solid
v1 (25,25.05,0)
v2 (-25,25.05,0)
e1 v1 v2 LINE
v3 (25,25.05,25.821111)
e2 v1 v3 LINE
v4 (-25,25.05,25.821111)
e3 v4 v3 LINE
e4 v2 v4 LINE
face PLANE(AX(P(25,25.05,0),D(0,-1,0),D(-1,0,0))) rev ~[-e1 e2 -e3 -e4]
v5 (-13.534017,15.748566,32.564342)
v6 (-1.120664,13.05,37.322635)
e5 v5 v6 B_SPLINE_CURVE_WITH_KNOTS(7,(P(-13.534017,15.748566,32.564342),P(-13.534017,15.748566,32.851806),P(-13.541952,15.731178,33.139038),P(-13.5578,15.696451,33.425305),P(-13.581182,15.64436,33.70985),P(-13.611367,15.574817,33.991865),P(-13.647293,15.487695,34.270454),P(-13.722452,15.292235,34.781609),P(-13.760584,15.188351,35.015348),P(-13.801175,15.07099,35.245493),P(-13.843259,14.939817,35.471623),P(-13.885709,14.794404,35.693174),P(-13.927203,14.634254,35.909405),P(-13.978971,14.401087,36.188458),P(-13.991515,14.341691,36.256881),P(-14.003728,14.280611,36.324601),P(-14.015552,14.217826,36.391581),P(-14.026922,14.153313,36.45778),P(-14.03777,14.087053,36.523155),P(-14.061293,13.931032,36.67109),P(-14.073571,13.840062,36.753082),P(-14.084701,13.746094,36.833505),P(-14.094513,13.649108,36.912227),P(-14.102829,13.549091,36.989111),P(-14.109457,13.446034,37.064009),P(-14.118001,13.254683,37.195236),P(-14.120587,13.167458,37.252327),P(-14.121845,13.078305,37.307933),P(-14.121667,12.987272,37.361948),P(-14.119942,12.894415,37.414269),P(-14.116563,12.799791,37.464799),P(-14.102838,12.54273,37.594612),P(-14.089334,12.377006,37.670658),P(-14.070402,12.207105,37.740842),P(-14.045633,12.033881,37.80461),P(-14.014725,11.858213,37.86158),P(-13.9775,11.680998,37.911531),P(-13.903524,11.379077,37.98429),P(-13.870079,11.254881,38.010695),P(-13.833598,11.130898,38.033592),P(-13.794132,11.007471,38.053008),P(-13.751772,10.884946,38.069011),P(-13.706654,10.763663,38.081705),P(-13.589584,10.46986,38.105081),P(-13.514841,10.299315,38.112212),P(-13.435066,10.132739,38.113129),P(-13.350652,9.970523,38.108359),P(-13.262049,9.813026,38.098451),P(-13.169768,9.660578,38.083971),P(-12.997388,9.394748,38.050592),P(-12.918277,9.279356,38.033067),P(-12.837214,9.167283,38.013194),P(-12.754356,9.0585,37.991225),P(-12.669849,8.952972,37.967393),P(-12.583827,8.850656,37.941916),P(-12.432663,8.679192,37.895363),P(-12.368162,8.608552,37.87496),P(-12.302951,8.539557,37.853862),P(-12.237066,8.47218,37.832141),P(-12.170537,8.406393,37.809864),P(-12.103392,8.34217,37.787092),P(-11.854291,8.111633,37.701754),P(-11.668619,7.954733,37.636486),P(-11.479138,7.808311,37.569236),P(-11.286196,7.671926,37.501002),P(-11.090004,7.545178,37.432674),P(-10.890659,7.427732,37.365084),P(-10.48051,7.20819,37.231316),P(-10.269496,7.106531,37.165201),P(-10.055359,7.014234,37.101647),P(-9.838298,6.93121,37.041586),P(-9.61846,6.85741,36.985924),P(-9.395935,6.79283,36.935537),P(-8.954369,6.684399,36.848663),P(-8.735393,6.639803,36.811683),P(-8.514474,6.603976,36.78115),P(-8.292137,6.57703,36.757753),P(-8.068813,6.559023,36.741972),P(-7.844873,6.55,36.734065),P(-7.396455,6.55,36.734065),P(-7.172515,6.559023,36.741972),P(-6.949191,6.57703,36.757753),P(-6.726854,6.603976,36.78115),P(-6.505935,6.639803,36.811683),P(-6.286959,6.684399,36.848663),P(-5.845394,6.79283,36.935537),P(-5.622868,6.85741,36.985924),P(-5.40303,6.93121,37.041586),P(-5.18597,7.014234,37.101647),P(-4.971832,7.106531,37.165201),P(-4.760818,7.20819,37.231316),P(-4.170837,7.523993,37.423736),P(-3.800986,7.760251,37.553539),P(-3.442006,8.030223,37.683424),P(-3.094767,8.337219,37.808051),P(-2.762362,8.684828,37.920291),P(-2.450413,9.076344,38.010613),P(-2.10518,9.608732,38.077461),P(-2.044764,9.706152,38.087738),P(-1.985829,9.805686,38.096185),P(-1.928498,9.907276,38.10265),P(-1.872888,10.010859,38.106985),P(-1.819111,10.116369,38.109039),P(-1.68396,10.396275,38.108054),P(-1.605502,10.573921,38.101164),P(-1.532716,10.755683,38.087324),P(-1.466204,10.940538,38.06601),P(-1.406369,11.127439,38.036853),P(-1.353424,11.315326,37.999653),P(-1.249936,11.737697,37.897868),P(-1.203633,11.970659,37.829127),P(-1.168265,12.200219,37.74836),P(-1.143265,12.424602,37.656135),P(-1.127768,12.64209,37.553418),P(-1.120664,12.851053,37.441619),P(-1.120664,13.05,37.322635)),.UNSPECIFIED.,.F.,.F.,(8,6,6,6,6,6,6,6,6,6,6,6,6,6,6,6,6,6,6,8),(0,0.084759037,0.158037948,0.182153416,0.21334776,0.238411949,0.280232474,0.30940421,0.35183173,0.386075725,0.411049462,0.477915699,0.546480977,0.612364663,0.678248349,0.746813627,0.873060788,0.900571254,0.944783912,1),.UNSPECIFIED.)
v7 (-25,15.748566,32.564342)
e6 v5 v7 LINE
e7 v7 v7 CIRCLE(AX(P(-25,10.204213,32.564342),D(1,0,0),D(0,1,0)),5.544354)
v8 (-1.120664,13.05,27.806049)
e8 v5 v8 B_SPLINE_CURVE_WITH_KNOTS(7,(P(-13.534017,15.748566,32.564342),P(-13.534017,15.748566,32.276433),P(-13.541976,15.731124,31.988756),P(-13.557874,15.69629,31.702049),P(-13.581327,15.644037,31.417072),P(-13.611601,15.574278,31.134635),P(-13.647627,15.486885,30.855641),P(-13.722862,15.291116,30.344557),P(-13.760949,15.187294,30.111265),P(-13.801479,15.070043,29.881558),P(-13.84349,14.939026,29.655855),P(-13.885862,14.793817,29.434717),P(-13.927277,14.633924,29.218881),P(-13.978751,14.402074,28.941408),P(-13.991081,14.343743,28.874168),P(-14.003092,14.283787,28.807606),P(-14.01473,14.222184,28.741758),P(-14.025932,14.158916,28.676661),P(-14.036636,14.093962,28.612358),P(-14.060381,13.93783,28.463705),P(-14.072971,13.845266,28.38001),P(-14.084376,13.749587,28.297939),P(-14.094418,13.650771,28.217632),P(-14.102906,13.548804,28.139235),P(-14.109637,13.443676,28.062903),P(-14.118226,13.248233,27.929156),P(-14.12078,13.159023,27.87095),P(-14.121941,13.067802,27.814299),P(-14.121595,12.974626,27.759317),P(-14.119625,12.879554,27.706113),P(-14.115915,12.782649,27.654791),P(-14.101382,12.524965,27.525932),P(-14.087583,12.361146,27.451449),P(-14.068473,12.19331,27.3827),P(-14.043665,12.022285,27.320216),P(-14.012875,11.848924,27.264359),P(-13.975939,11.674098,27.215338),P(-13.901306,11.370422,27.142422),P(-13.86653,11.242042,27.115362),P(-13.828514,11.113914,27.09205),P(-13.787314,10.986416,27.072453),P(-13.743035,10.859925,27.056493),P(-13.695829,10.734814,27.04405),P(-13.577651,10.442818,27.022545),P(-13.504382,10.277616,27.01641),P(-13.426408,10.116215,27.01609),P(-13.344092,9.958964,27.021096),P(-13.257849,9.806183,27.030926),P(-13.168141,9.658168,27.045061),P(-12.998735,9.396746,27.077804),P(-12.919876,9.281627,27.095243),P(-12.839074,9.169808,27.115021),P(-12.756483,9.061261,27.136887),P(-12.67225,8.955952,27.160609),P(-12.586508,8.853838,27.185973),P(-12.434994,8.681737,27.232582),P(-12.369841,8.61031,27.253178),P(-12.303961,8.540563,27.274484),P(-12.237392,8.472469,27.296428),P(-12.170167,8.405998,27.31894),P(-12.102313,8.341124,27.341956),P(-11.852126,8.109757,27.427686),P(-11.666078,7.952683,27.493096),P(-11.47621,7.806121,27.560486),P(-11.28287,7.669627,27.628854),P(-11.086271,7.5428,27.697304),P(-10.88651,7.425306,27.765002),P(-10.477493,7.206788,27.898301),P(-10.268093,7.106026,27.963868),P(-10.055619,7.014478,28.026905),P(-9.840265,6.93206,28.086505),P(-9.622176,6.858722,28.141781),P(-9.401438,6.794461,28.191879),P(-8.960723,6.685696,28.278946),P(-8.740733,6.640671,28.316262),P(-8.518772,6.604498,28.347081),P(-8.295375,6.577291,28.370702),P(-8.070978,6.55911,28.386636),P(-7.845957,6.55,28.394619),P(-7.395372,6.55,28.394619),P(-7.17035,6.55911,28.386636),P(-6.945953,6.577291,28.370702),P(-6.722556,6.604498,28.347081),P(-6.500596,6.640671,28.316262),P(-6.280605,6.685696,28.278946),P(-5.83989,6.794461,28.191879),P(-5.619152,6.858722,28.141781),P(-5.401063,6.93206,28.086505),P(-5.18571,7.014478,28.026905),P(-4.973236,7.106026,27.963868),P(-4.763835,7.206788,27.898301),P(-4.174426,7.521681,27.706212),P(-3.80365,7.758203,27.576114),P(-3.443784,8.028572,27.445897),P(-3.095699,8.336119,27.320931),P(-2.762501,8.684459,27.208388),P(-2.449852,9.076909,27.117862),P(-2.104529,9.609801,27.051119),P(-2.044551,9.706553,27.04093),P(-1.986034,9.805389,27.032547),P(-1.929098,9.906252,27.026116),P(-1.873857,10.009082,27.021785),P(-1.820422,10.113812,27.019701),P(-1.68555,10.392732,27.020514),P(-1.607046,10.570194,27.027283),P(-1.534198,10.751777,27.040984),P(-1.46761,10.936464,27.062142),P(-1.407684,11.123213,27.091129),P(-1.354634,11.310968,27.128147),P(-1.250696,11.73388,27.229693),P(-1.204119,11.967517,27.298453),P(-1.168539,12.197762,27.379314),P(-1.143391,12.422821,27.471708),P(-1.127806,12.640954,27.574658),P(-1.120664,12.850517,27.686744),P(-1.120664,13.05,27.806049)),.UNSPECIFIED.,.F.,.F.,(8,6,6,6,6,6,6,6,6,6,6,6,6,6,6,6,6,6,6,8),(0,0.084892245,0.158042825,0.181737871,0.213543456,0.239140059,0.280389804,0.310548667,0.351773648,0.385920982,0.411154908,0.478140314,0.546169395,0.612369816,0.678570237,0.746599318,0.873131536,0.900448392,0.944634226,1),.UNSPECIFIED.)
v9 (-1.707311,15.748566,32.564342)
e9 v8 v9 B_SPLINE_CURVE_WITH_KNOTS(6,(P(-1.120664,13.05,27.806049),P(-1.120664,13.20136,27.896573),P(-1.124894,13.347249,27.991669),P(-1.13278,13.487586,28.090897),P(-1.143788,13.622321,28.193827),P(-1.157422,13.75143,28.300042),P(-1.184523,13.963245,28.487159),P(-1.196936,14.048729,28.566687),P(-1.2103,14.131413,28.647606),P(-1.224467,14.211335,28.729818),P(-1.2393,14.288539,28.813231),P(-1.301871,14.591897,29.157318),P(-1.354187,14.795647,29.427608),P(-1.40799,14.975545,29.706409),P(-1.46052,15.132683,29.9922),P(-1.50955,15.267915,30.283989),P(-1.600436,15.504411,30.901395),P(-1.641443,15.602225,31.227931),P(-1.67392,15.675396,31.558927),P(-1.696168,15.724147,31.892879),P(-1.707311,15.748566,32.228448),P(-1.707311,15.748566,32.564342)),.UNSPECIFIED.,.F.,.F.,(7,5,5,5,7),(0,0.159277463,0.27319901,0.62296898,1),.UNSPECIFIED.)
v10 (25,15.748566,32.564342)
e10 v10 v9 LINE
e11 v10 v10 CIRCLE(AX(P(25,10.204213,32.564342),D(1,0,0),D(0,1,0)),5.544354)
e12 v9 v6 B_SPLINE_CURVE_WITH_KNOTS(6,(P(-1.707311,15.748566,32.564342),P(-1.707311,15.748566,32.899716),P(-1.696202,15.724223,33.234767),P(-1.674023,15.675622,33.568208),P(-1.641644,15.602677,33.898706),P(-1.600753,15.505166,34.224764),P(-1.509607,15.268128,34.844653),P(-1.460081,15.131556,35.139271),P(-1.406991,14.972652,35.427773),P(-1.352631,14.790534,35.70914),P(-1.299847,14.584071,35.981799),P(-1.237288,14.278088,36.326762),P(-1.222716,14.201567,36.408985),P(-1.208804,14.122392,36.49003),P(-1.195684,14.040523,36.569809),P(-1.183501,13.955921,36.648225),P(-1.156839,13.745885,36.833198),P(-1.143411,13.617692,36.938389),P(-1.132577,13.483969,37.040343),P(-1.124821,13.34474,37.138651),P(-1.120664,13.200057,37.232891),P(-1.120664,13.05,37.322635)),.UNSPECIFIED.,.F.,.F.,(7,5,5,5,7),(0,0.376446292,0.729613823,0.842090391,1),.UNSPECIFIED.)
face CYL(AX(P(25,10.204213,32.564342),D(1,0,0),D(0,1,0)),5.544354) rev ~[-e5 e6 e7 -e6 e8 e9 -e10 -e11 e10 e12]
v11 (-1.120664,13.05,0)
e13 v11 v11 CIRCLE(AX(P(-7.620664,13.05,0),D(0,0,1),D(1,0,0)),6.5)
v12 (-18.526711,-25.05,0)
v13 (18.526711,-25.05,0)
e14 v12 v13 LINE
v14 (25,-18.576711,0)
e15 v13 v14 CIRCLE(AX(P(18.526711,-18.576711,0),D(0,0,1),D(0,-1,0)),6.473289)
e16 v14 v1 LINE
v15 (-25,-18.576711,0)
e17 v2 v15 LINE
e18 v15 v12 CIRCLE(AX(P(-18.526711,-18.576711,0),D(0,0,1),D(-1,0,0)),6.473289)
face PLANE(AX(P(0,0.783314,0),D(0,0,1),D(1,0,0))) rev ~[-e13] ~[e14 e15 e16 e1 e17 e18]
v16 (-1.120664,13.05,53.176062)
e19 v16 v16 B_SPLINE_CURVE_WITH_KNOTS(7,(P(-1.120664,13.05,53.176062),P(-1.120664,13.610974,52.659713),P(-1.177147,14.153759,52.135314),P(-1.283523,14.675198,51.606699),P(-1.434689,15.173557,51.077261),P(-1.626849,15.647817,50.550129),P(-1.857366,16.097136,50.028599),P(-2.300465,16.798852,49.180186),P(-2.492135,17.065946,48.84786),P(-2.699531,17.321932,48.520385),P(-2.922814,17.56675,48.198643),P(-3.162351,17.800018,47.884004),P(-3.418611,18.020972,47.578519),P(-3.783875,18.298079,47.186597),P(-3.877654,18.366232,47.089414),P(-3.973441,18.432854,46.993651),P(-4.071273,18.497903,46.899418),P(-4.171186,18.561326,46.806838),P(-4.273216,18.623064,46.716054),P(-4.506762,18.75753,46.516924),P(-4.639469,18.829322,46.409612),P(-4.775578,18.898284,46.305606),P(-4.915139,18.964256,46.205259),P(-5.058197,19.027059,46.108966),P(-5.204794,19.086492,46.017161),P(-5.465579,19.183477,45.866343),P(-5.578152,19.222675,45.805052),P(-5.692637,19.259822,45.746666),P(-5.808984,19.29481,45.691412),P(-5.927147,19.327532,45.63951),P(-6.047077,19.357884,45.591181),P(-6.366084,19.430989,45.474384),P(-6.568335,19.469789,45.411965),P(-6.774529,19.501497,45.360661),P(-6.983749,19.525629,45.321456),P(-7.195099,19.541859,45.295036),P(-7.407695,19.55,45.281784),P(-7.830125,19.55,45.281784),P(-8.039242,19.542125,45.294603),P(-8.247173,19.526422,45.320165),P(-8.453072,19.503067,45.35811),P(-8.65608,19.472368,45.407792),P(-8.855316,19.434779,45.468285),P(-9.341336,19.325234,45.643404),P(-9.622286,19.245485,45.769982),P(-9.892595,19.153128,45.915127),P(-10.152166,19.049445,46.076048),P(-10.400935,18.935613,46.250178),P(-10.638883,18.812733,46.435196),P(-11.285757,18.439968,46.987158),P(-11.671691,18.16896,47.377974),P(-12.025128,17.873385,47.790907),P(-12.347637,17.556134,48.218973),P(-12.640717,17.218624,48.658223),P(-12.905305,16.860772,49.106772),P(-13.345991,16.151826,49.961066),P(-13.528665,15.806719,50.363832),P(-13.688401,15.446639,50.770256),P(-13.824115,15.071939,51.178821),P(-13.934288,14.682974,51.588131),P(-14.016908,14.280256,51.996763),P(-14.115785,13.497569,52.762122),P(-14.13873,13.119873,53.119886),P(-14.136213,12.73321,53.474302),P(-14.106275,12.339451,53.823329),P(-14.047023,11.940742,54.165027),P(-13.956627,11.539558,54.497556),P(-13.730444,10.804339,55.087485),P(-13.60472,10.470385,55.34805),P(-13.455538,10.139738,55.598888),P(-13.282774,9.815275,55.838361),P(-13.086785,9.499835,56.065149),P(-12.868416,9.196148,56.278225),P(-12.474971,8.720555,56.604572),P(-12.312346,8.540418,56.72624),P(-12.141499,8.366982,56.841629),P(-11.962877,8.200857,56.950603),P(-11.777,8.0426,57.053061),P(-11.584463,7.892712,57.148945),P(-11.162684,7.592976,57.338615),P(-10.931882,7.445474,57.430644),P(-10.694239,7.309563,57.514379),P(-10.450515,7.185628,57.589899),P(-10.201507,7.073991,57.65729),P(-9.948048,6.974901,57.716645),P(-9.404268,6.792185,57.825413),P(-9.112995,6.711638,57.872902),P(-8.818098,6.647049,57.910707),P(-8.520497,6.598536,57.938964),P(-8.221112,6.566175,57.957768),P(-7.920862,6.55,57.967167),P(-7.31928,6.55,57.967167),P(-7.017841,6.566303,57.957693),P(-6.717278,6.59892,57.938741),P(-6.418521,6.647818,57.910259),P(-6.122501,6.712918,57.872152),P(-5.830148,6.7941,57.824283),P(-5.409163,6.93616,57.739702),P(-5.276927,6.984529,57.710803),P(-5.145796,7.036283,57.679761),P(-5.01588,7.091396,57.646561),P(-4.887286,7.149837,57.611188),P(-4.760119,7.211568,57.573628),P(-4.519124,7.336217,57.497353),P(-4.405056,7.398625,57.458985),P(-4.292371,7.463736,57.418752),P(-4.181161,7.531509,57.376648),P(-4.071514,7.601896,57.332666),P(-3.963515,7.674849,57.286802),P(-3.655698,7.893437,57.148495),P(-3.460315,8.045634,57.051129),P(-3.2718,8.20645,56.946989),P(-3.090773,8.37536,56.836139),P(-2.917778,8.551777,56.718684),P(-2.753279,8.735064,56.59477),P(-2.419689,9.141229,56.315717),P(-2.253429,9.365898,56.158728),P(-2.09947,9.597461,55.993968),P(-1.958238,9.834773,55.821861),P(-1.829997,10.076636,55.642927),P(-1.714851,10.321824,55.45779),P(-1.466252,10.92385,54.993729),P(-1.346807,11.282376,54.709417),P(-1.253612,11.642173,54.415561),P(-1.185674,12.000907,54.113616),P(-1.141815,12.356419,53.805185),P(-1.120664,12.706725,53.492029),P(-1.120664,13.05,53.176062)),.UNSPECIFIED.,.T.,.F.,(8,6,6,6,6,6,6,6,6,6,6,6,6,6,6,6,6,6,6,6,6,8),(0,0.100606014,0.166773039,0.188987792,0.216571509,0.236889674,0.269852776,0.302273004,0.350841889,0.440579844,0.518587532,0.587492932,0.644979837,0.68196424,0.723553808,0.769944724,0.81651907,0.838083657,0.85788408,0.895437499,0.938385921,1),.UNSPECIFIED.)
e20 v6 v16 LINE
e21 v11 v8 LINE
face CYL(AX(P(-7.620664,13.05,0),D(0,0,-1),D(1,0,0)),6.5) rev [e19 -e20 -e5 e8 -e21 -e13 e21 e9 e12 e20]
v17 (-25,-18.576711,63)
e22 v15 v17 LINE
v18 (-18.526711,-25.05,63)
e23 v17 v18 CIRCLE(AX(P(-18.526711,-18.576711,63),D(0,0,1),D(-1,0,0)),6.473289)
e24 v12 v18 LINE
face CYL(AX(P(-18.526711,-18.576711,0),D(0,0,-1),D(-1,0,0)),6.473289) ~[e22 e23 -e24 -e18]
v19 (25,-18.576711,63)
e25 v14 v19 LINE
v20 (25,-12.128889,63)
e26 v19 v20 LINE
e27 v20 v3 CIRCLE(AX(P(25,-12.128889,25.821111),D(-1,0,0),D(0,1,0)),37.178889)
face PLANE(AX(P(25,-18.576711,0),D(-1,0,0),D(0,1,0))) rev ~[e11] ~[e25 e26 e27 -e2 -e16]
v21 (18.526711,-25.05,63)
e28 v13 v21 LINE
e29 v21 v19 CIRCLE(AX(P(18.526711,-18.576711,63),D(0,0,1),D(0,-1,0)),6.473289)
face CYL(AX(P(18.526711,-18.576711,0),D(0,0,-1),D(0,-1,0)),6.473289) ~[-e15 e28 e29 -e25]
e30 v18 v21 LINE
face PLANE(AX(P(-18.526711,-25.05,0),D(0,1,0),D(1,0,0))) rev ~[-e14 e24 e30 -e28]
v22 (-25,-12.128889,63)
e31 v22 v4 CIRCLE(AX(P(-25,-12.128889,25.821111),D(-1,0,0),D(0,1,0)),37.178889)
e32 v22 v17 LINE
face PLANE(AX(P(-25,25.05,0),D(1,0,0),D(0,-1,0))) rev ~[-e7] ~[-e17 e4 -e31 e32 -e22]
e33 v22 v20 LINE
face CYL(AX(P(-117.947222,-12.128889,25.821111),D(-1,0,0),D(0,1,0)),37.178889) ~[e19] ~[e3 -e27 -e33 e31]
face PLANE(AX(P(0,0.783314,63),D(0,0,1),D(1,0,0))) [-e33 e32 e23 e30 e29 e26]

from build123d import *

# Parameters (mm, degrees)
F0_R        = 6.5
F1_DEPTH    = 63
F2_T1_DEPTH = 235.8944443027
F3_R        = 5.5443537003
F4_DEPTH    = 50.0010001


# Not quite as in the source:
# - a fillet or chamfer that OpenCascade refuses, or shapes differently, is made with other operations: its cross-section is extruded or revolved along the edge and cut away or added


with BuildPart() as f1:
    # F0 (on Top) → F1 (new body)
    with BuildSketch(Plane.XY):
        with BuildLine():
            ThreePointArc((-25, -18.57671062), (-23.1040174372, -23.1540174372), (-18.52671062, -25.05))
            Line((-18.52671062, -25.05), (18.52671062, -25.05))
            ThreePointArc((18.52671062, -25.05), (23.1040174372, -23.1540174372), (25, -18.57671062))
            Line((25, -18.57671062), (25, 25.05))
            Line((25, 25.05), (-25, 25.05))
            Line((-25, 25.05), (-25, -18.57671062))
        make_face()
        with Locations((-7.6206641026, 13.05)):
            Circle(F0_R, mode=Mode.SUBTRACT)
    extrude(amount=F1_DEPTH)

    # F2: fillet of radius 37.1788888605 on 1 edges, made by hand

    # F2_s2 → F2_t1 (cut)
    with BuildSketch(Plane.YZ.offset(-117.9472221514)):
        with BuildLine():
            ThreePointArc((25.05, 25.8211111395), (14.1605555697, 52.1105555697), (-12.1288888605, 63))
            Line((-12.1288888605, 63), (25.05, 63))
            Line((25.05, 63), (25.05, 25.8211111395))
        make_face()
    extrude(amount=F2_T1_DEPTH, mode=Mode.SUBTRACT)

    # F3 (on face) → F4 (cut, through all)
    with BuildSketch(Plane.YZ.offset(25)):
        with Locations((10.2042127401, 32.5643420219)):
            Circle(F3_R)
    extrude(amount=-F4_DEPTH, mode=Mode.SUBTRACT)


solid = f1.part
